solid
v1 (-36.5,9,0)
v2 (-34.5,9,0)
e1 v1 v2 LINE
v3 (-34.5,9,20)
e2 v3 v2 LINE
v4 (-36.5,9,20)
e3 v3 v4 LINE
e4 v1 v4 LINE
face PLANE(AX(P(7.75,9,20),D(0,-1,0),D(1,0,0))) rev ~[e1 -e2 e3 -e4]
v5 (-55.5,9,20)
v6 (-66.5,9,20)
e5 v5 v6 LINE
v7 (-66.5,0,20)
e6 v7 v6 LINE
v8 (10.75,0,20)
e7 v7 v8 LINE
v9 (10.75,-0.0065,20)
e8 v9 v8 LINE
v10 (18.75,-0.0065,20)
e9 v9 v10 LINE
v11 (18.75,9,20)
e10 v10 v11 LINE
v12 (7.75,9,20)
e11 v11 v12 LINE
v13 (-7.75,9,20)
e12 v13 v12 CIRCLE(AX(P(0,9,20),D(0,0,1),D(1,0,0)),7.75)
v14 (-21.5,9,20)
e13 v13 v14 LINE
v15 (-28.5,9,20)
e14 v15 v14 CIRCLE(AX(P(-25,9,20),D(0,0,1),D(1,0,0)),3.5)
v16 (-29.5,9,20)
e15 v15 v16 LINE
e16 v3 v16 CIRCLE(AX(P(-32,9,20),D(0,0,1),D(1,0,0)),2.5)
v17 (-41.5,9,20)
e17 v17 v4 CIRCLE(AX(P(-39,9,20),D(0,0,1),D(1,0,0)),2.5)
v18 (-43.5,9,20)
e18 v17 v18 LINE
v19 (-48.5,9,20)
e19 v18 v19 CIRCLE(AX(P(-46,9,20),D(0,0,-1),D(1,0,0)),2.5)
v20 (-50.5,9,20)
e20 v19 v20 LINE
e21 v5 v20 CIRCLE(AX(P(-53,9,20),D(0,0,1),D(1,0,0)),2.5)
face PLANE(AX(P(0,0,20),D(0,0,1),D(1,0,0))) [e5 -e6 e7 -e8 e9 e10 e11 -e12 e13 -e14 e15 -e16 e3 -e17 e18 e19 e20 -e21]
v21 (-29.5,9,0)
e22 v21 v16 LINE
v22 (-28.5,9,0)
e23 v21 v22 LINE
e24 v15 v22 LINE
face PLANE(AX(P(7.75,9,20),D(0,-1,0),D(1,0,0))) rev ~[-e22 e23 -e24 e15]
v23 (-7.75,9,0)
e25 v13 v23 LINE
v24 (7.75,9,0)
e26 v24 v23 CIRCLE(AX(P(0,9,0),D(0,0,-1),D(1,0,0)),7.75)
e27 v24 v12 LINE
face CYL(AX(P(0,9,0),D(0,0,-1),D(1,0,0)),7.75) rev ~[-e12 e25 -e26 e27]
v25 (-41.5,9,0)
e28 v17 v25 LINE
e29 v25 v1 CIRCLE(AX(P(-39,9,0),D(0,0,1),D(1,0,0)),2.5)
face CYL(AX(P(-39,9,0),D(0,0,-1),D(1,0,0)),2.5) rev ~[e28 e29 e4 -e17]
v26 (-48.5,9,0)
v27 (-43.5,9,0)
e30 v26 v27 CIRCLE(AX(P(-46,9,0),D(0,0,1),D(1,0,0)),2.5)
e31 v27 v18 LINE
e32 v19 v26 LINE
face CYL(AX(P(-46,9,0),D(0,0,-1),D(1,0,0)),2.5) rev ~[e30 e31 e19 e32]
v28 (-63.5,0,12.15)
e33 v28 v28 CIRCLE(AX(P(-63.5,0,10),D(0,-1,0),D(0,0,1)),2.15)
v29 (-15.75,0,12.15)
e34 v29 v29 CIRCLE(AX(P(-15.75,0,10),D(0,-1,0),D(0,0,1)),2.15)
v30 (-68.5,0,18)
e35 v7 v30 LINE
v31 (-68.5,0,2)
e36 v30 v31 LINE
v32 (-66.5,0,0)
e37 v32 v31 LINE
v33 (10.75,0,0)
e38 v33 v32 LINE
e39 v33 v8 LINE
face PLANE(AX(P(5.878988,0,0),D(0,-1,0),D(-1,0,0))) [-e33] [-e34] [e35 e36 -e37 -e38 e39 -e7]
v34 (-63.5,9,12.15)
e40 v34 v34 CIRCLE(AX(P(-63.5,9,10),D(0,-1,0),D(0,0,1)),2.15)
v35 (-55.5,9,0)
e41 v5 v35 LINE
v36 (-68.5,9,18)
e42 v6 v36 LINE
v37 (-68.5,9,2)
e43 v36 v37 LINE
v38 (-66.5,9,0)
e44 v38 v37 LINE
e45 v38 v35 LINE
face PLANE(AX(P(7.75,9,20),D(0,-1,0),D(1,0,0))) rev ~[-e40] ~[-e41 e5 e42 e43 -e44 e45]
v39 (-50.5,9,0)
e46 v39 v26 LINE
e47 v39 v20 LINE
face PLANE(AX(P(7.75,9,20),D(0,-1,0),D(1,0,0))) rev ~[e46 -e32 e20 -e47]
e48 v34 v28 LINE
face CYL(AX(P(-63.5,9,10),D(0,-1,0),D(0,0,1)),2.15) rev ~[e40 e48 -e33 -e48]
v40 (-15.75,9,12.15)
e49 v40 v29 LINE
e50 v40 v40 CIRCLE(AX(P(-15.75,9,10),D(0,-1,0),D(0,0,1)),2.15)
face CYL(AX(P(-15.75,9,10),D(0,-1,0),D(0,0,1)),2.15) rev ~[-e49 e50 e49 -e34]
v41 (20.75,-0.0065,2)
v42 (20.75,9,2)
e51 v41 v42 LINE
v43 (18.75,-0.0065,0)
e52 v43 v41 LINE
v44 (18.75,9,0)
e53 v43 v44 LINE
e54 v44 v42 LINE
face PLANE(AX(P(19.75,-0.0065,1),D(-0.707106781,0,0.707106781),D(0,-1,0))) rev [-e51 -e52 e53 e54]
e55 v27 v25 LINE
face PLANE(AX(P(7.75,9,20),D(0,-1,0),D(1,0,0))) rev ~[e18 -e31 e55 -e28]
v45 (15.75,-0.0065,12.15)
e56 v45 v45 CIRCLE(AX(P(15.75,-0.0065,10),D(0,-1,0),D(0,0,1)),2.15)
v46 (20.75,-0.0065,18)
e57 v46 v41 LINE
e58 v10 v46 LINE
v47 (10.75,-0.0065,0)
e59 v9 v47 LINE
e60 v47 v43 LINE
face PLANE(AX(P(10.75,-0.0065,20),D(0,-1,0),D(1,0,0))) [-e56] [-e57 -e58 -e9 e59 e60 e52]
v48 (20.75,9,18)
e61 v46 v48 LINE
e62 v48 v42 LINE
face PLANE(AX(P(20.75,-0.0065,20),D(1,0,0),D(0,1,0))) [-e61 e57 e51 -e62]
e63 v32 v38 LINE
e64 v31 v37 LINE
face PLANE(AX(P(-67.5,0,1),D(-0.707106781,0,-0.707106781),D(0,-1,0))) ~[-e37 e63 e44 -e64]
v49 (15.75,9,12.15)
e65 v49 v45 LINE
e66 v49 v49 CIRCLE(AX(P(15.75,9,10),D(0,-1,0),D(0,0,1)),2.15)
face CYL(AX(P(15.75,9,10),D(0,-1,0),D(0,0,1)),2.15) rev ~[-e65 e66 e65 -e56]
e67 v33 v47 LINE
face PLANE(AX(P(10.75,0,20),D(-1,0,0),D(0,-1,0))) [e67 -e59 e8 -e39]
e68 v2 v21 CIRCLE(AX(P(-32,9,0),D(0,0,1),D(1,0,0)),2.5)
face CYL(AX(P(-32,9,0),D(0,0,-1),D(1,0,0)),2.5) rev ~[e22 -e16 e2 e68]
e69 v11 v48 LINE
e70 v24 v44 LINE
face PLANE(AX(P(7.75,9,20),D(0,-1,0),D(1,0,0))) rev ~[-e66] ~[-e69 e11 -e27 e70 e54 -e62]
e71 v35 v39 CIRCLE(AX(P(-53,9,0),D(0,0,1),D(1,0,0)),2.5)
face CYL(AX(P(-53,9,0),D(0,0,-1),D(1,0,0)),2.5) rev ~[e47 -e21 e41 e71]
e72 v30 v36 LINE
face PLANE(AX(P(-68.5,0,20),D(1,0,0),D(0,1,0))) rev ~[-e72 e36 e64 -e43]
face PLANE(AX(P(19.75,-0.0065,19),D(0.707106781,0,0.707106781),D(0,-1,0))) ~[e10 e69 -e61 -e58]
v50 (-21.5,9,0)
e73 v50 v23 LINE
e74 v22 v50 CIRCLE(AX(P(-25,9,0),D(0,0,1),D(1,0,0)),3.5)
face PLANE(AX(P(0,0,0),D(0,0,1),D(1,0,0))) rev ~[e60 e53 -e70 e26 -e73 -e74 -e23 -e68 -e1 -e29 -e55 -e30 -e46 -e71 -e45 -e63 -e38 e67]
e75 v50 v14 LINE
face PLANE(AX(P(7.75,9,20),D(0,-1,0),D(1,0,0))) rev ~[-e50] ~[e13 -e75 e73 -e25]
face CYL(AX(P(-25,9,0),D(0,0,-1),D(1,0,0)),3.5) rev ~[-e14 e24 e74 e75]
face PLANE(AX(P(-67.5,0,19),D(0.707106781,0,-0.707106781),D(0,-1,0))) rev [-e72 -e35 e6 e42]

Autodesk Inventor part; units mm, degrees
ref_plane "YZ Plane" through (0, 0, 0) normal (1, 0, 0) x (0, 1, 0)
ref_plane "XZ Plane" through (0, 0, 0) normal (0, 1, 0) x (-1, 0, 0)
ref_plane "XY Plane" through (0, 0, 0) normal (0, 0, 1) x (1, 0, 0)
sketch "スケッチ1" plane through (0, 0, 0) normal (0, 0, 1) x (1, 0, 0)
  circle A0 centre (0, 9) radius 7.75
  line L0 (10.75, 0) -> (-58.5, 0)
  line L1 (-58.5, 0) -> (-58.5, 1.25)
  line L2 (-58.5, 1.25) -> (10.75, 1.25)
  line L3 (10.75, 1.25) -> (10.75, 0)
  circle A1 centre (0, 9) radius 10.75
  line L4 (10.75, 1.25) -> (10.75, 15.8822)
  circle A2 centre (-32, 9) radius 2.5
  circle A3 centre (-39, 9) radius 2.5
  circle A4 centre (-25, 9) radius 3.5
  circle A5 centre (-46, 9) radius 2.5
  circle A6 centre (-53, 9) radius 2.5
  circle A7 centre (-53, 9) radius 5.5
  line L5 (-58.5, 1.25) -> (-58.5, 21.0928)
  line L6 (-61.1769, 14.5) -> (16.6826, 14.5)
  point P0 (0, 0)
  point P1 (-9.2365, 14.5)
  point P2 (-58.5, 14.5)
  point P3 (10.75, 14.5)
  point P4 (9.2365, 14.5)
  point P5 (10.75, 9)
  point P6 (5.879, 0)
  point P7 (-5.879, 0)
  dimension "d0" = 15.5
  dimension "d1" = 3
  dimension "d2" = 5
  dimension "d3" = 5
  dimension "d4" = 7
  dimension "d5" = 5
  dimension "d7" = 7
  dimension "d8" = 7
  dimension "d9" = 25
  dimension "d10" = 7
  dimension "d11" = 5
  dimension "d12" = 7
  dimension "d13" = 3
  dimension "d16" = 9
extrude "押し出し1" add sketch "スケッチ1" along normal blind 20 contours A0 L6 A1 L2 | A0 L6 A1 | L2 A1 L6 A0 | L2 A1 L0 | L6 L4 A1 | A1 L0 L1 L2 | L2 L5 A7 A5 L6 A1 | A1 L4 L2 | L2 L3 L0 A1 | A7 A5 | A7 L5 L6 picked at (-49.0972, 10.8197)
sketch "スケッチ3" plane through (0, 0, 20) normal (0, 0, 1) x (1, 0, 0)
  line L0 (-9.2365, 14.5) -> (-58.5, 14.5) projected
  line L1 (-58.5, 14.5) -> (-58.5, 0) projected
  line L2 (-58.5, 0) -> (10.75, 0) projected
  arc A0 (9.2365, 14.5) -> (-9.2365, 14.5) centre (0, 9) ccw projected
  circle A1 centre (0, 9) radius 7.75 projected
  circle A2 centre (-53, 9) radius 2.5 projected
  circle A3 centre (-25, 9) radius 3.5 projected
  circle A4 centre (-39, 9) radius 2.5 projected
  circle A5 centre (-32, 9) radius 2.5 projected
  circle A6 centre (-46, 9) radius 2.5 projected
  line L3 (-58.5, 14.5) -> (-58.5, 0) projected
  line L4 (-58.5, 0) -> (-68.5, 0)
  line L5 (-68.5, 0) -> (-68.5, 14.5)
  line L6 (-68.5, 14.5) -> (-58.5, 14.5)
  line L7 (-58.5, 14.5) -> (-58.5, 0)
  line L8 (10.75, -0.0065) -> (20.75, -0.0065)
  line L9 (20.75, -0.0065) -> (20.75, 14.5)
  line L10 (20.75, 14.5) -> (10.75, 14.5)
  line L11 (10.75, 14.5) -> (10.75, -0.0065)
  line L12 (10.75, 0) -> (10.75, 14.5) projected
  line L13 (10.75, 14.5) -> (9.2365, 14.5) projected
  point P0 (0, 0)
  dimension "d17" = 10
  dimension "d18" = 10
extrude "押し出し2" add sketch "スケッチ3" against normal up to surface (20 mm away) contours L1 L4 L5 L6 | L10 L9 L8 L11
sketch "スケッチ4" plane through (0, 0, 20) normal (0, 0, 1) x (1, 0, 0)
  line L0 (-9.2365, 14.5) -> (-68.5, 14.5) projected
  line L1 (-68.5, 14.5) -> (-68.5, 0) projected
  line L2 (-68.5, 0) -> (10.75, 0) projected
  line L3 (20.75, -0.0065) -> (20.75, 14.5) projected
  line L4 (20.75, 14.5) -> (9.2365, 14.5) projected
  arc A0 (9.2365, 14.5) -> (-9.2365, 14.5) centre (0, 9) ccw projected
  circle A1 centre (0, 9) radius 7.75 projected
  circle A2 centre (-53, 9) radius 2.5 projected
  circle A3 centre (-25, 9) radius 3.5 projected
  circle A4 centre (-39, 9) radius 2.5 projected
  circle A5 centre (-32, 9) radius 2.5 projected
  circle A6 centre (-46, 9) radius 2.5 projected
  line L5 (-68.5, 0) -> (-68.5, 14.5) projected
  line L6 (-68.5, 9) -> (20.75, 9)
  line L7 (20.75, 9) -> (20.75, 30.4065)
  line L8 (20.75, 30.4065) -> (-68.5, 30.4065)
  line L9 (-68.5, 30.4065) -> (-68.5, 9)
  line L10 (10.75, 0) -> (10.75, -0.0065) projected
  line L11 (10.75, -0.0065) -> (20.75, -0.0065) projected
  point P0 (0, 0)
  point P1 (-55.5, 9)
  point P2 (-40.5, 9)
  point P3 (-48.5, 9)
  point P4 (-33.5, 9)
  point P5 (-41.5, 9)
  point P6 (-26.5, 9)
  point P7 (-34.5, 9)
  point P8 (-19.5, 9)
  point P9 (-18.5, 9)
  point P10 (-21.5, 9)
  point P11 (7.75, 9)
  point P12 (7.75, 9)
  point P13 (10.75, 9)
  point P14 (-21.5, 9)
  point P15 (-28.5, 9)
  point P16 (-29.5, 9)
  point P17 (-29.5, 9)
  point P18 (-36.5, 9)
  point P19 (-36.5, 9)
  point P20 (-43.5, 9)
  point P21 (-43.5, 9)
  point P22 (-50.5, 9)
  point P23 (-50.5, 9)
  point P24 (-68.5, 14.5065)
  point P25 (20.75, 14.5)
  point P26 (-68.5, 14.5)
  point P27 (20.75, 14.5)
extrude "押し出し3" cut sketch "スケッチ4" against normal through all contours A0 L4 L3 L6 A1 A3 A5 A4 A6 A2 L1 L0 | L0 L9 L8 L7 L4 A0 | A2 L6 | L6 A1 | A6 L6 | L6 A3 | A4 L6 | L6 A5 picked at (-52.3762, 9.5526) picked at (1.4675, 11.126) picked at (-45.3762, 9.5526) picked at (-24.5863, 10.0909) picked at (-38.3762, 9.5526) picked at (-32.7192, 9.9399)
sketch "スケッチ6" plane through (7.75, 9, 20) normal (0, 1, 0) x (1, 0, 0)
  line L0 (0, 0) -> (0, 20) projected
  line L1 (13, 0) -> (0, 0) projected
  line L2 (13, 20) -> (13, 0) projected
  line L3 (-29.25, 0) -> (-29.25, 20) projected
  line L4 (-15.5, 0) -> (-29.25, 0) projected
  line L5 (-15.5, 20) -> (-15.5, 0) projected
  line L6 (-63.25, 20) -> (-63.25, 0) projected
  line L7 (-76.25, 0) -> (-76.25, 20) projected
  line L8 (-63.25, 0) -> (-76.25, 0) projected
  line L9 (-76.25, 20) -> (-63.25, 20) projected
  line L10 (-29.25, 20) -> (-15.5, 20) projected
  line L11 (0, 20) -> (13, 20) projected
  point P0 (-7.75, 20)
  point P1 (8, 10)
  point P2 (-23.5, 10)
  point P3 (-71.25, 10)
  dimension "d33" = 10
  dimension "d34" = 5
  dimension "d35" = 5
  dimension "d36" = 15.75
hole "穴2" at (15.75, 9, 10) at (-15.75, 9, 10) at (-63.5, 9, 10) direction (0, -1, 0) diameter 4.3 end through all
chamfer "面取り1" distance 2 angle 45 4 edges at (20.75, 4.4968, 0) (20.75, 4.4968, 20) (-68.5, 4.5, 0) (-68.5, 4.5, 20)
properties part number "C_Unit_Cable_Holder_B"
